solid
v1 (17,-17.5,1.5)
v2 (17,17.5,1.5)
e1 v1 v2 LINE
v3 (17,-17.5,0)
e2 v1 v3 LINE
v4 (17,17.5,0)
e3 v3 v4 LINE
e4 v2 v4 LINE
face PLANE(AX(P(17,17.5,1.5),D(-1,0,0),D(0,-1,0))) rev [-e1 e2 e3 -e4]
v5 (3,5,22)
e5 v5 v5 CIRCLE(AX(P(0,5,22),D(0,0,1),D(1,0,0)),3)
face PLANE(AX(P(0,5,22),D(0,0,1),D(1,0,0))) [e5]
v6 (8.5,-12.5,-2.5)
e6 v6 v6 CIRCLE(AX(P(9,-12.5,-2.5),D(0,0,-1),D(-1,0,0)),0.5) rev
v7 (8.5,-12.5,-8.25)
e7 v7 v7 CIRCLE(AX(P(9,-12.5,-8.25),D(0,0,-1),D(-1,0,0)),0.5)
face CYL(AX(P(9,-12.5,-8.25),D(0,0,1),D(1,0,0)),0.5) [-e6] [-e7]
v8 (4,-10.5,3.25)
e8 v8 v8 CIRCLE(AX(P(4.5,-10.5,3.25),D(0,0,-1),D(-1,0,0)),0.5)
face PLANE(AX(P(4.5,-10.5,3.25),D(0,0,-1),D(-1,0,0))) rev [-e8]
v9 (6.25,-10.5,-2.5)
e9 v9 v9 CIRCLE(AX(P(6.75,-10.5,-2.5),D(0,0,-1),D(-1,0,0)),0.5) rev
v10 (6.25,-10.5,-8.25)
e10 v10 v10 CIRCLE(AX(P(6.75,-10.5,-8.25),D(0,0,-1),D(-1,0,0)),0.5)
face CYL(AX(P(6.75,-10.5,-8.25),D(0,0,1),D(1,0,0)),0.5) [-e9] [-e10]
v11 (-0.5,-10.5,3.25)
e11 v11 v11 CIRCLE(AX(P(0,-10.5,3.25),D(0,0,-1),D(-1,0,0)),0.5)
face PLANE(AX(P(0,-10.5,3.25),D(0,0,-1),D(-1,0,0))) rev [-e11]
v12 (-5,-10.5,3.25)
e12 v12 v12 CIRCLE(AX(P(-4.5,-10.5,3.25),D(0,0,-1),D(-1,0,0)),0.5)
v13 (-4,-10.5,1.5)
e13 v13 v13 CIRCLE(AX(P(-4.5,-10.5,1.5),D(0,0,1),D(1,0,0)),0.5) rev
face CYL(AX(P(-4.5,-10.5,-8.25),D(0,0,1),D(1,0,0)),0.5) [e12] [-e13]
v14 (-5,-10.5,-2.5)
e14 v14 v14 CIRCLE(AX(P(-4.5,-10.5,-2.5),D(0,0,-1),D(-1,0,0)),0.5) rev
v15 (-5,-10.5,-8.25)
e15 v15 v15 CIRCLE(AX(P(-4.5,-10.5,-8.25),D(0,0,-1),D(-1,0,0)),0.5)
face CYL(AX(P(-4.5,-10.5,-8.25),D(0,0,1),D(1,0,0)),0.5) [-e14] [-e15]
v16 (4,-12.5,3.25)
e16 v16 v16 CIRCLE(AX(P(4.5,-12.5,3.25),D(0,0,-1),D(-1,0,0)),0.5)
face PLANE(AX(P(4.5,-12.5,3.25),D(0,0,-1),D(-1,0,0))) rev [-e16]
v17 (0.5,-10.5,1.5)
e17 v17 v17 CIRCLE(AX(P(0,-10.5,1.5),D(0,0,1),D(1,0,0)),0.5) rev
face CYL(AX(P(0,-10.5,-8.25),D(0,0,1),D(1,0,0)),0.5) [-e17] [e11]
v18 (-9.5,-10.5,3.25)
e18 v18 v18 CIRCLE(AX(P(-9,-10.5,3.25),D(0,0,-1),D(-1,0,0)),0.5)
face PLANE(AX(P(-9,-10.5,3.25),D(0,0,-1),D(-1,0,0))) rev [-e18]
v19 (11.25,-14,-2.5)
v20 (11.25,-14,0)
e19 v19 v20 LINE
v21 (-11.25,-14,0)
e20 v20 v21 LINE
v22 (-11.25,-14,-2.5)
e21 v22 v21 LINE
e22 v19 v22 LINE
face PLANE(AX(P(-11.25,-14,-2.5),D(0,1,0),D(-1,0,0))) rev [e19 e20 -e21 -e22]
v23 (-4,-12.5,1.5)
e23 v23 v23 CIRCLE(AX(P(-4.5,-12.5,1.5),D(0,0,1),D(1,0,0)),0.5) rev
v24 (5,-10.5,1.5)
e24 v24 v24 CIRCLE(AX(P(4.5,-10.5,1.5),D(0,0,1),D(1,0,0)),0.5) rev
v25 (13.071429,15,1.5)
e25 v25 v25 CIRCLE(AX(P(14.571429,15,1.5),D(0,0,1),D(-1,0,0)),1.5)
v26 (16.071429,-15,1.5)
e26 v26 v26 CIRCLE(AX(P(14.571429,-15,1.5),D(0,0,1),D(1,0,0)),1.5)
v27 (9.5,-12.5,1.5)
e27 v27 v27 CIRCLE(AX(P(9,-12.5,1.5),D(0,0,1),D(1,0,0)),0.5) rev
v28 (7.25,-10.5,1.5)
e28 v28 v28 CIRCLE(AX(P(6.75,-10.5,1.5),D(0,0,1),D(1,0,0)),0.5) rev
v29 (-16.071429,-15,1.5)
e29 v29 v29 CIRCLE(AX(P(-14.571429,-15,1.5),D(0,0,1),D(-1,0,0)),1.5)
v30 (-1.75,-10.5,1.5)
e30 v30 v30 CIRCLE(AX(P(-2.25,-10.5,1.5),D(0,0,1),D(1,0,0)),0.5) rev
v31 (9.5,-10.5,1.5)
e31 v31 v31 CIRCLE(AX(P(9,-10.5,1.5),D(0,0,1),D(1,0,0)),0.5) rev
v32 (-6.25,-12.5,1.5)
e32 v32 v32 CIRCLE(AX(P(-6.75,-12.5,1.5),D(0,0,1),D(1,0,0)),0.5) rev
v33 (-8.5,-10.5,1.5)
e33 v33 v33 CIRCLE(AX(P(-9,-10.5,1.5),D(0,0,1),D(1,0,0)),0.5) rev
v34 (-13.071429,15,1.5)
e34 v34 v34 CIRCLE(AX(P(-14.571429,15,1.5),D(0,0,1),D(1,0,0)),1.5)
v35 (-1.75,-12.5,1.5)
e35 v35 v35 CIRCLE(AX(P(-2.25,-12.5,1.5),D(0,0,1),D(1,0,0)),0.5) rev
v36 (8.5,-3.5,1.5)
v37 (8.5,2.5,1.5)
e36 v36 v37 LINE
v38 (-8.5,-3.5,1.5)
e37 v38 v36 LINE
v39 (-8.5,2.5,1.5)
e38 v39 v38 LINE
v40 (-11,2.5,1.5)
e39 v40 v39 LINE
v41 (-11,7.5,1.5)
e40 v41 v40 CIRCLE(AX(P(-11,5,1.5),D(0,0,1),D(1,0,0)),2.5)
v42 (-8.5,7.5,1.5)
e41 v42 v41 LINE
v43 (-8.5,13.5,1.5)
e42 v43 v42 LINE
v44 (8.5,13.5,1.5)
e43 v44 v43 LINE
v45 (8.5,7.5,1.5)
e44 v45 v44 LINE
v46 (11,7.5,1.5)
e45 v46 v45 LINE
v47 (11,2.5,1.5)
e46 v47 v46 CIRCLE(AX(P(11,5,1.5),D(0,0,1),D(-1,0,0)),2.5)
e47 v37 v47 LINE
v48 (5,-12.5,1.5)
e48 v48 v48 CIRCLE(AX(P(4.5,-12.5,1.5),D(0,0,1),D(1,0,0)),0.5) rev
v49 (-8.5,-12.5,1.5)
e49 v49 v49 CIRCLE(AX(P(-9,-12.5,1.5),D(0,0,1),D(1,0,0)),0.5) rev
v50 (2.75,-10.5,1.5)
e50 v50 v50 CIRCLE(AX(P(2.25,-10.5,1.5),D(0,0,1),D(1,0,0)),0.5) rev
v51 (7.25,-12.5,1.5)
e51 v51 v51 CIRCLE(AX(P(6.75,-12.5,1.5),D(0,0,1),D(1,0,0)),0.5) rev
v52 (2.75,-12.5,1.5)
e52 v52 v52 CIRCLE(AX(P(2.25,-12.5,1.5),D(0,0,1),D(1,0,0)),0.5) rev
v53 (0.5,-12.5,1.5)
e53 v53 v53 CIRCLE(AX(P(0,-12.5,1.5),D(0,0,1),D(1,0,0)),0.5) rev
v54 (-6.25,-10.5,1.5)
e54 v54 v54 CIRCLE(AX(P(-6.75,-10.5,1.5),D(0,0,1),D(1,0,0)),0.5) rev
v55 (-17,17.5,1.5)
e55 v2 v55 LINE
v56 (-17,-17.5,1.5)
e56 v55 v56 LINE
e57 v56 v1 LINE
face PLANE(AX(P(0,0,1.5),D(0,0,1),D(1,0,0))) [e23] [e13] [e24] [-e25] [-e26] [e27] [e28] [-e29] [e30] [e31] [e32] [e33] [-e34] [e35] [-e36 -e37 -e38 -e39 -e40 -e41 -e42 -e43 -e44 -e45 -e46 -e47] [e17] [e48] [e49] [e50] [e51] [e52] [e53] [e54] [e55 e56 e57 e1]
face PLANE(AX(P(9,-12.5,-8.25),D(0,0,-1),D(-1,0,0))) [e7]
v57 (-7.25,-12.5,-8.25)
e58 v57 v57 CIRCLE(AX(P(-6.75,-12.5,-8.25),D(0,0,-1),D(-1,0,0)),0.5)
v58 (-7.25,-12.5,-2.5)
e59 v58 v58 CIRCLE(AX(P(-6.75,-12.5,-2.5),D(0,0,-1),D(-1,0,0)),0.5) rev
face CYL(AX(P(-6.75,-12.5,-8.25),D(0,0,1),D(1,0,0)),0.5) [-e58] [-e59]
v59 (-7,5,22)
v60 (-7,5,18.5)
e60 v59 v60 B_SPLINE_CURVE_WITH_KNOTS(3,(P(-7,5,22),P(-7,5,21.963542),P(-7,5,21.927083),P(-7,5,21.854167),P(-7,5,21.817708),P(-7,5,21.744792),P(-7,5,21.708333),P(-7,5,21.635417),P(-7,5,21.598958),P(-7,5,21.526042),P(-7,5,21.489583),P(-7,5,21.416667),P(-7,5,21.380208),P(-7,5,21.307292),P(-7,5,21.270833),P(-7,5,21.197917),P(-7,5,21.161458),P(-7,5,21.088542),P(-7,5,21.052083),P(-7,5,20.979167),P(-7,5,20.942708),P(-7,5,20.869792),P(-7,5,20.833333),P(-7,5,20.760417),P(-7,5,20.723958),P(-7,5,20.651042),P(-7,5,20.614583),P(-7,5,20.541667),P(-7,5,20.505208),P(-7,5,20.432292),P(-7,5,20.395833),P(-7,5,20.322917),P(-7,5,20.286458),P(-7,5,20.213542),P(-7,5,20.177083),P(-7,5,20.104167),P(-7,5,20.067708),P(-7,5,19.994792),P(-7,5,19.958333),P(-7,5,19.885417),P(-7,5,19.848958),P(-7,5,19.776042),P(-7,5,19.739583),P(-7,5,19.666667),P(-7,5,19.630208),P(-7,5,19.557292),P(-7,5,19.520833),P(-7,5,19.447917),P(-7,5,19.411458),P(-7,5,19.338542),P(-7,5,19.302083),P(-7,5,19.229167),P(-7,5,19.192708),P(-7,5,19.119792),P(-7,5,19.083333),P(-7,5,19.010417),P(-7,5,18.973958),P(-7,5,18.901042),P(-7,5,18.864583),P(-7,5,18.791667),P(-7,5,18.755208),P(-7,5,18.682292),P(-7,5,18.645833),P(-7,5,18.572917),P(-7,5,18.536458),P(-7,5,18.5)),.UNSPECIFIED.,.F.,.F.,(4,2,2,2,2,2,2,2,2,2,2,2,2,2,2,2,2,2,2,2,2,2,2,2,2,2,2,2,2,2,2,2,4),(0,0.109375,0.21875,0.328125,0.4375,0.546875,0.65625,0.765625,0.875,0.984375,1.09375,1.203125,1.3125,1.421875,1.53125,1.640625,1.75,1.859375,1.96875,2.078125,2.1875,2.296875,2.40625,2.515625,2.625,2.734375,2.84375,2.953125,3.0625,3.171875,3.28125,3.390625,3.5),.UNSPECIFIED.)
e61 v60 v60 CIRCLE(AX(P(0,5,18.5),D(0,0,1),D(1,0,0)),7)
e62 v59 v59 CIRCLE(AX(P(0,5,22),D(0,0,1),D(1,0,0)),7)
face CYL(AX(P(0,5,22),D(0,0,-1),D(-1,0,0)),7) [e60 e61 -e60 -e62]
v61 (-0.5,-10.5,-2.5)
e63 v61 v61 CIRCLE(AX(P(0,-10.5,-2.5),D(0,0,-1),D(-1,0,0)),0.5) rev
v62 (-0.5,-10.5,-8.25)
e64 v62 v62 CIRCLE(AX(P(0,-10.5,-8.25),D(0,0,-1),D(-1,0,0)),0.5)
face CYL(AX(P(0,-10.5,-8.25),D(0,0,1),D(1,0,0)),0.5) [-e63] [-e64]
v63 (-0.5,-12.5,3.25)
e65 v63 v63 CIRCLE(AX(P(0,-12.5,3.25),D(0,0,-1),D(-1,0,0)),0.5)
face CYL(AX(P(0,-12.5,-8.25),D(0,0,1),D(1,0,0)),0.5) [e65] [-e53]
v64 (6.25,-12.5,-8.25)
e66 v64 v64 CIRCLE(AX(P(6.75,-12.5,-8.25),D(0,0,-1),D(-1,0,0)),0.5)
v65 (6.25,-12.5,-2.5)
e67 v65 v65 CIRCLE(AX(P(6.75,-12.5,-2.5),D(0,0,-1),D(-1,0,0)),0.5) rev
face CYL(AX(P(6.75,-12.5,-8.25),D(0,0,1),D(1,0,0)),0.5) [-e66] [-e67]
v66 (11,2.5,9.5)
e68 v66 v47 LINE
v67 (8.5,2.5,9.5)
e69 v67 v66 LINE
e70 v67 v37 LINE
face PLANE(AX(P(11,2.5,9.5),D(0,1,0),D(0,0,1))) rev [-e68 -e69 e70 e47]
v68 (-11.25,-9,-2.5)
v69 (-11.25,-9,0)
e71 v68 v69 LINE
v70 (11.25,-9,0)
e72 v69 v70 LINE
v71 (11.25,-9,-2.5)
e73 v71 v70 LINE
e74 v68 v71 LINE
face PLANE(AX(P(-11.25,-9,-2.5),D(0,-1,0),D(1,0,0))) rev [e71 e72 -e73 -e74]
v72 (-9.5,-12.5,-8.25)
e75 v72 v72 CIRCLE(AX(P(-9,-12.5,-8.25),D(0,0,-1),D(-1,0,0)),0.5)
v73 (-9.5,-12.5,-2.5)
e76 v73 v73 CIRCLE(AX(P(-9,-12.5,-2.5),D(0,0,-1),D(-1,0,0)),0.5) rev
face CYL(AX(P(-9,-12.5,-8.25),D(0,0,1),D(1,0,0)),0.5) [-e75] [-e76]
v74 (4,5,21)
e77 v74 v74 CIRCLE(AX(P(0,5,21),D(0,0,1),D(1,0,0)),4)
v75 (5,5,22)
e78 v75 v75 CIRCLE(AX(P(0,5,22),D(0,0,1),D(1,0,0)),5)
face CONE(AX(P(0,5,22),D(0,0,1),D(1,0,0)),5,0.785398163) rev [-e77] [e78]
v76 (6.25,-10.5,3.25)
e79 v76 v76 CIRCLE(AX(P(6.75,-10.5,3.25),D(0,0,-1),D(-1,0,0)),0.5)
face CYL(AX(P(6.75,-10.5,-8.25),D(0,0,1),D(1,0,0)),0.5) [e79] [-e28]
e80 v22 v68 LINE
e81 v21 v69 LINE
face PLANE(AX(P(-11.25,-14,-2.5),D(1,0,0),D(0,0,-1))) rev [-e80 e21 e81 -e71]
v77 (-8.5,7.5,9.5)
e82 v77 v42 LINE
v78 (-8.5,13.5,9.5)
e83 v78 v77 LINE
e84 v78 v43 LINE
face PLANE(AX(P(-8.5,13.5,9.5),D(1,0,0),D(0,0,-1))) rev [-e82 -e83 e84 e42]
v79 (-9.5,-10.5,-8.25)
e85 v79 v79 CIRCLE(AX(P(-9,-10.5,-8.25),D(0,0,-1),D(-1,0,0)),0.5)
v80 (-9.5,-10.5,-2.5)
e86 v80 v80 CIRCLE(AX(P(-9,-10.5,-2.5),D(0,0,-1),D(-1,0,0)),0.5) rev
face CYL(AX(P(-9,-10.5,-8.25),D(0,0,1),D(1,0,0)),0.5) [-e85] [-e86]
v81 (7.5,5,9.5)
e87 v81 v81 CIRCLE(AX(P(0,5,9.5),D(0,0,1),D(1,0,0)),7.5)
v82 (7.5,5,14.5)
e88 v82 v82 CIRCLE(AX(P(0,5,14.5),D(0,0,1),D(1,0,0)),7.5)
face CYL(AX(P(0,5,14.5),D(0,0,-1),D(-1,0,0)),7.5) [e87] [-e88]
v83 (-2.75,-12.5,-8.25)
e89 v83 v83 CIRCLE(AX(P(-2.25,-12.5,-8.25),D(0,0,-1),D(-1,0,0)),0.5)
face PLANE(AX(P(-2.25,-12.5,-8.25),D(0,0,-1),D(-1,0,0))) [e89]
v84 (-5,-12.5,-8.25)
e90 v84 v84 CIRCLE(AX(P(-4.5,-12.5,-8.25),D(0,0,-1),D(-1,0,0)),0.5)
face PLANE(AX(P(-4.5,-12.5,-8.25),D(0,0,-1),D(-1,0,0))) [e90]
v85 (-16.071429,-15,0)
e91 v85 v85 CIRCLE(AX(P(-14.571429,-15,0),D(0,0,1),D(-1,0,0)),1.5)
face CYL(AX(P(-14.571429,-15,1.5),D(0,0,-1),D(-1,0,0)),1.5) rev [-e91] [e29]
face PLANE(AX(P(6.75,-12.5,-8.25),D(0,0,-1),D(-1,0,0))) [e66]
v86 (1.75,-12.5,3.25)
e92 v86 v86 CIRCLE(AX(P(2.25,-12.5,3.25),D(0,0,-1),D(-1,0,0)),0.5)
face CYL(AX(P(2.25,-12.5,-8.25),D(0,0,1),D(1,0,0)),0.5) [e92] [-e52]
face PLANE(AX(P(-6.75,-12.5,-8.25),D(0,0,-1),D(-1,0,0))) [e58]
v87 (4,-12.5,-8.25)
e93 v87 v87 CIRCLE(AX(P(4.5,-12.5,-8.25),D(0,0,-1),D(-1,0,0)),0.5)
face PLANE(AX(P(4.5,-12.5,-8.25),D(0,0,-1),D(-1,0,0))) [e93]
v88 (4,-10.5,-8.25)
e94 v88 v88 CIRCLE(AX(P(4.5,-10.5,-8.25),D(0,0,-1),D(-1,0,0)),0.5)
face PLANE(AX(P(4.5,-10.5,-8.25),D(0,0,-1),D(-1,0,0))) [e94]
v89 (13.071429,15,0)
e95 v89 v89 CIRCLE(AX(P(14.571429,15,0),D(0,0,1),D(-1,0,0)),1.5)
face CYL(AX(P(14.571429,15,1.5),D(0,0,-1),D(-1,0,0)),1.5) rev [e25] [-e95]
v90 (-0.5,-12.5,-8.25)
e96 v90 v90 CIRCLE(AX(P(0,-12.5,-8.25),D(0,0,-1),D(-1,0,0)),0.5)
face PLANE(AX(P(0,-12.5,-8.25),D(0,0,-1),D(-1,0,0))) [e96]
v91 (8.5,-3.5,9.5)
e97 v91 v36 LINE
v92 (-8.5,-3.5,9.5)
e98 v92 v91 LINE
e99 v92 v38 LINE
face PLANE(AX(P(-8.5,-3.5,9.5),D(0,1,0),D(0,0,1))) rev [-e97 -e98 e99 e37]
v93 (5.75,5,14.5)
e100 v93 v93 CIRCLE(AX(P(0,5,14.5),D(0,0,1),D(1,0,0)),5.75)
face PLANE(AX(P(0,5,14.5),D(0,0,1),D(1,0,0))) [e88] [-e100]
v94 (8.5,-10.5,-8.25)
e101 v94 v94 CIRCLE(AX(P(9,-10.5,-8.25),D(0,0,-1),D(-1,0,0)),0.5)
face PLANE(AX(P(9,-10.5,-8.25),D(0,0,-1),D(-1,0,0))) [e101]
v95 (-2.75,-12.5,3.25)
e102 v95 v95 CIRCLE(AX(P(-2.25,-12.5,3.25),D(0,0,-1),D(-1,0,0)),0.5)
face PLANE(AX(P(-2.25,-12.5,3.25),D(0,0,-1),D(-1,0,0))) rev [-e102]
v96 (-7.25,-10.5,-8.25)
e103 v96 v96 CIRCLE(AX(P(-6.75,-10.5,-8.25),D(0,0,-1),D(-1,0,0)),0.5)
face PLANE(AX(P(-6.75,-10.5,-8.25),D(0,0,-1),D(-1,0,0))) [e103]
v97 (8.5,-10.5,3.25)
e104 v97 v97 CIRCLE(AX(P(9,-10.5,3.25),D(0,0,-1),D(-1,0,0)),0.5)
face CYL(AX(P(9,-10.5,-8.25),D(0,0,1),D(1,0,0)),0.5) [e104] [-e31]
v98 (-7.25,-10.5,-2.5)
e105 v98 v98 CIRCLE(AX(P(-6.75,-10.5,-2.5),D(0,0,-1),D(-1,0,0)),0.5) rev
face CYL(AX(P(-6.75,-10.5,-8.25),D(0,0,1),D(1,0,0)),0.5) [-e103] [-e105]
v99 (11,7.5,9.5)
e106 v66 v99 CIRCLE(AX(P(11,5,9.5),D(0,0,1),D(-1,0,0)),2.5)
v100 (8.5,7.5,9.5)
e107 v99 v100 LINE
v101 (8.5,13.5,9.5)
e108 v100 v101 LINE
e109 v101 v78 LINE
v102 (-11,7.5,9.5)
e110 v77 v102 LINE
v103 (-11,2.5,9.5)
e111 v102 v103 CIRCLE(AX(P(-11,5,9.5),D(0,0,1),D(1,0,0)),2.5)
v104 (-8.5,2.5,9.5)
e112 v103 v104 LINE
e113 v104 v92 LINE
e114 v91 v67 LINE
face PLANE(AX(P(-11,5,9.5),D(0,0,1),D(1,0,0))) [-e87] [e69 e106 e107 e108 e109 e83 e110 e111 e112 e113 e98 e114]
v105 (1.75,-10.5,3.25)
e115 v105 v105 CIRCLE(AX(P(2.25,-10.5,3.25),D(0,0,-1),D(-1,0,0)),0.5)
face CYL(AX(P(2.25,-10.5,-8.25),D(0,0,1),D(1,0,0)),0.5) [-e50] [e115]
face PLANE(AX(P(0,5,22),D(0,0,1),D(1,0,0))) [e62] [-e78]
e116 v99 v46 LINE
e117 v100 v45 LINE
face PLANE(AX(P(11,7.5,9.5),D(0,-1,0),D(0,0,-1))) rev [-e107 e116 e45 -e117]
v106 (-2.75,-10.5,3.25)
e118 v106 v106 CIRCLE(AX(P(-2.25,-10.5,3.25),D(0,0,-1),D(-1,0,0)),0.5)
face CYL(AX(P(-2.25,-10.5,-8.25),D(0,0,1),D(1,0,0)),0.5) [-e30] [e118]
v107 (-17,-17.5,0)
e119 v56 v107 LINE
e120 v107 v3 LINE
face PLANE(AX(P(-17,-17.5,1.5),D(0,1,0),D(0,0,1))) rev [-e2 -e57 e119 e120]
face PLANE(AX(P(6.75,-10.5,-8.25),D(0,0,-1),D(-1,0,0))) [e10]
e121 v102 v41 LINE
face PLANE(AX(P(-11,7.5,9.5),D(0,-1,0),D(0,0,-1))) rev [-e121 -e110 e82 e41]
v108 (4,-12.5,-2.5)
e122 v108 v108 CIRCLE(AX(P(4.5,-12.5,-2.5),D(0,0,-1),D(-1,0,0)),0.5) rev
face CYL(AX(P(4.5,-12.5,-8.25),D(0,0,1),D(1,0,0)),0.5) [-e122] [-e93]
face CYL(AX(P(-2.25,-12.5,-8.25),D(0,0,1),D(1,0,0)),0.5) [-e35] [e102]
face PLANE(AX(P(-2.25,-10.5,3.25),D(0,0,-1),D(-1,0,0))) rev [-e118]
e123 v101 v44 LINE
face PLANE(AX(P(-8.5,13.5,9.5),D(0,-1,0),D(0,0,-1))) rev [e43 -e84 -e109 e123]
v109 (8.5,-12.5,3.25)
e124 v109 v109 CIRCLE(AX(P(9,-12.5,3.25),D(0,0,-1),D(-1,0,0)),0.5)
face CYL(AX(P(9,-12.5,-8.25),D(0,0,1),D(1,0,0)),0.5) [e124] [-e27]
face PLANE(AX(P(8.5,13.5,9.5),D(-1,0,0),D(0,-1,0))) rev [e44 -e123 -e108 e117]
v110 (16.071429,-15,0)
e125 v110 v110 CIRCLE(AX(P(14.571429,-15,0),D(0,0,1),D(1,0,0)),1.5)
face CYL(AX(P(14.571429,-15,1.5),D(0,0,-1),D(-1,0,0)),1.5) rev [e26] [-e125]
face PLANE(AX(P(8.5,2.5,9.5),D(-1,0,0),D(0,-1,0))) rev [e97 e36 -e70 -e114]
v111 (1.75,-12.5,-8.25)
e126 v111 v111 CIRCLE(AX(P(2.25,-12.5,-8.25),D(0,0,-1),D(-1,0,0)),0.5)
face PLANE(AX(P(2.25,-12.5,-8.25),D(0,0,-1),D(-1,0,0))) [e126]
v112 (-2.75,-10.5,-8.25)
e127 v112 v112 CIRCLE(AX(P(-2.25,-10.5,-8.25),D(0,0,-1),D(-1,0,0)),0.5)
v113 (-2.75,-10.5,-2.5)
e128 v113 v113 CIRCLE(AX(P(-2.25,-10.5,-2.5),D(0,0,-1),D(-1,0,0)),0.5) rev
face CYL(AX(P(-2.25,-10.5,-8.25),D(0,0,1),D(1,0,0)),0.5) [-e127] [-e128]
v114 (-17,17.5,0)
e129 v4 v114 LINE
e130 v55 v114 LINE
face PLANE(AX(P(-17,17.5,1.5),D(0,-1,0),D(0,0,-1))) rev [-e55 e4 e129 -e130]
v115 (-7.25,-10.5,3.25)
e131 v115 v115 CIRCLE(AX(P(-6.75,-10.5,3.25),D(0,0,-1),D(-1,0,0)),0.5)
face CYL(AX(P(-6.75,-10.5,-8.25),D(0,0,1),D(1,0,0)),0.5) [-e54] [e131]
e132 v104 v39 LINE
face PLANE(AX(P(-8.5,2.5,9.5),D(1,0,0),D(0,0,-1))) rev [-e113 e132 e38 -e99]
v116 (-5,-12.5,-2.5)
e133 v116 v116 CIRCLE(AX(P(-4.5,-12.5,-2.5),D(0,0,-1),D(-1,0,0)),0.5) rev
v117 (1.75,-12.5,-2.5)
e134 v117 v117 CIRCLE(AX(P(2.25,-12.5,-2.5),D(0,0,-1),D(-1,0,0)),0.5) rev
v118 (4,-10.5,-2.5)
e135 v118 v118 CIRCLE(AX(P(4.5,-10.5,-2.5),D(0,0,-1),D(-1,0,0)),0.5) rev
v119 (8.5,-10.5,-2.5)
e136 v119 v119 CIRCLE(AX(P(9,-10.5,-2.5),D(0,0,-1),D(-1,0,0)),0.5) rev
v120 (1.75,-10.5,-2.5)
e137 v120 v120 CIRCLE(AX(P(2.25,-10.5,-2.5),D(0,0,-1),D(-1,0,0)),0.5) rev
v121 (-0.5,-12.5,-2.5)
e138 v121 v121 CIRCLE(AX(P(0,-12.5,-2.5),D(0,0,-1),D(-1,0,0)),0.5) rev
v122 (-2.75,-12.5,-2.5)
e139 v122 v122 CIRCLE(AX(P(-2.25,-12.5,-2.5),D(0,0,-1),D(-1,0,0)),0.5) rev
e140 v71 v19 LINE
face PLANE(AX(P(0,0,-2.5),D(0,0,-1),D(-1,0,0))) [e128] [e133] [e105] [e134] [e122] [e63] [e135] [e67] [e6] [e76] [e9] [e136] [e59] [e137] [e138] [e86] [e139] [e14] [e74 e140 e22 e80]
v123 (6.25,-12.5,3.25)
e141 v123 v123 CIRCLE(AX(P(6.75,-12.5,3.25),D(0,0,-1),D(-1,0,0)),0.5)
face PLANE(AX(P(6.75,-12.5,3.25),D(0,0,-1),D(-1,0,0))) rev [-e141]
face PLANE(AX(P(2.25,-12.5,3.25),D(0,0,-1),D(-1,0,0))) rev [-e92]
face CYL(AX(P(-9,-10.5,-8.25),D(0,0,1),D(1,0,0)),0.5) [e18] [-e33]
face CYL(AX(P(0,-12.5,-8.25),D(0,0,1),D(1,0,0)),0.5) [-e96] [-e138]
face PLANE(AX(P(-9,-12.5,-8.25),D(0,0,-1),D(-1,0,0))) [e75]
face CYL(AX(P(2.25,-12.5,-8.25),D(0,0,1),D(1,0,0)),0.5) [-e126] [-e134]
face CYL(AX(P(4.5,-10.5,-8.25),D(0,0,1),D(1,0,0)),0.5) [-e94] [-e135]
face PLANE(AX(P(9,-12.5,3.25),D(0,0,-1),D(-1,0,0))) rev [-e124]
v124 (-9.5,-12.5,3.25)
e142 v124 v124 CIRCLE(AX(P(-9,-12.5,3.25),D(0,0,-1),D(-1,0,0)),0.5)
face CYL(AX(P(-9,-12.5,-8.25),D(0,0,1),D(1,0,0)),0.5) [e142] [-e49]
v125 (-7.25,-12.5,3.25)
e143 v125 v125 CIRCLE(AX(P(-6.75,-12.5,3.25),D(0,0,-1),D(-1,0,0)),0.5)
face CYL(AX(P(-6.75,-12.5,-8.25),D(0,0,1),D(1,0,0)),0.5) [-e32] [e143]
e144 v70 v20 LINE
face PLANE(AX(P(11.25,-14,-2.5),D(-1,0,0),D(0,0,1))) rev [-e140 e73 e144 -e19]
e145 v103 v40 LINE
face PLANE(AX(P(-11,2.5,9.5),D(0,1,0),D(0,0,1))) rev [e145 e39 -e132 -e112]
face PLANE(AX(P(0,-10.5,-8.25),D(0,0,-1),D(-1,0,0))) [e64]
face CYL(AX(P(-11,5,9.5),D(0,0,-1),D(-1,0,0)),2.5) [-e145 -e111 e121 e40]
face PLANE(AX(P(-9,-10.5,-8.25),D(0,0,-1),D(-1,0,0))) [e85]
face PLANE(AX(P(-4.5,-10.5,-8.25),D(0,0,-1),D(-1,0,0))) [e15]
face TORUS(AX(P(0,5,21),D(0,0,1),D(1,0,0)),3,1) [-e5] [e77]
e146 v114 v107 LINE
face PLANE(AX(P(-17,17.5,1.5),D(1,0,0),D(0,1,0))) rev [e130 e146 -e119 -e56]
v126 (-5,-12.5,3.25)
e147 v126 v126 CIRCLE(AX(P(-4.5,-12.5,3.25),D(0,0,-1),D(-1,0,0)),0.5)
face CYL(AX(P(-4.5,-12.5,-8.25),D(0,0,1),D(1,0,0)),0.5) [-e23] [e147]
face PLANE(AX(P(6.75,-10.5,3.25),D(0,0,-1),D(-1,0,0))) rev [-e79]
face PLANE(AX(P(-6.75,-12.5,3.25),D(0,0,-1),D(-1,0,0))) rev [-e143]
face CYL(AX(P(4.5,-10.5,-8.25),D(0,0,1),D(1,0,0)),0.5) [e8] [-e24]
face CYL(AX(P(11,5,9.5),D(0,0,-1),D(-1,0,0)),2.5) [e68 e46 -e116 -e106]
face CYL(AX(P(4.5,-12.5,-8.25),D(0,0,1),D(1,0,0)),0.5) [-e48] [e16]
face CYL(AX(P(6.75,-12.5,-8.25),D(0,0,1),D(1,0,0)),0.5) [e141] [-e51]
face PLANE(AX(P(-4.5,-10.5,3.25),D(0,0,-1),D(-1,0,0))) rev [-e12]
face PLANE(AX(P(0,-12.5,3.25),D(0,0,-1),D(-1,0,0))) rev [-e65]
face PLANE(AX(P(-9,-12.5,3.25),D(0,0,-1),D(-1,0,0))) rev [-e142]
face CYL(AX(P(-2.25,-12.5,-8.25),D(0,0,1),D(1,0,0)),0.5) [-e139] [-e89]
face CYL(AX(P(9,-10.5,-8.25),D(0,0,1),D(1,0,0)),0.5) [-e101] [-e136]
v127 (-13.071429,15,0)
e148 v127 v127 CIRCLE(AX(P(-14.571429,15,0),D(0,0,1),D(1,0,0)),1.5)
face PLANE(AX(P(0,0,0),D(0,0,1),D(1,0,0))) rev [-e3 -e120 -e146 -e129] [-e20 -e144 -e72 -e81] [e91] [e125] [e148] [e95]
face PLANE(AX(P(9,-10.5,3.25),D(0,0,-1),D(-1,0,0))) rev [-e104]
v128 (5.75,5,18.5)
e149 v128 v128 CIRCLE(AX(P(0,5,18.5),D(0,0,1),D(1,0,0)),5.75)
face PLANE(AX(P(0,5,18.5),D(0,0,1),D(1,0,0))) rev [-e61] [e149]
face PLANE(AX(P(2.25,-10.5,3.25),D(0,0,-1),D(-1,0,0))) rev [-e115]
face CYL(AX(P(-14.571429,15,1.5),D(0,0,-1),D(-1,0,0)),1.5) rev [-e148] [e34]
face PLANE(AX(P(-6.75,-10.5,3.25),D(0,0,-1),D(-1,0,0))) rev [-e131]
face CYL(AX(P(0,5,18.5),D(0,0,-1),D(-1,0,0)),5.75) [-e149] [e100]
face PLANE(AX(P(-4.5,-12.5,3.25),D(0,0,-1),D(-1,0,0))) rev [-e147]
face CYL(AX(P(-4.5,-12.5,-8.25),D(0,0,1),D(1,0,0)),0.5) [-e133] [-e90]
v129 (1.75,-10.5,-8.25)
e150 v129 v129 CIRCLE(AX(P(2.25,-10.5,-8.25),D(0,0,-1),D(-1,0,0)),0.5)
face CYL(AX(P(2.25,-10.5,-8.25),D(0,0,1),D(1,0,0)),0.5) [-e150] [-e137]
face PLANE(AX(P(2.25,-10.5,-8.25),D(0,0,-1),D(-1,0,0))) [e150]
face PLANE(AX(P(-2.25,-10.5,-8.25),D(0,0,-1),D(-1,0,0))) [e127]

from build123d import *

# Parameters (mm, degrees)
CROQUIS1_W              = 34
CROQUIS1_H              = 35
CROQUIS1_R              = 1.5
SALIENTE_EXTRUIR1_DEPTH = 1.5
CROQUIS2_W              = 22.5
CROQUIS2_H              = 5
SALIENTE_EXTRUIR2_DEPTH = 2.5
SALIENTE_EXTRUIR3_DEPTH = 8
CROQUIS4_R              = 7.5
SALIENTE_EXTRUIR4_DEPTH = 5
CROQUIS5_R              = 5.75
SALIENTE_EXTRUIR5_DEPTH = 4
CROQUIS6_R              = 7
SALIENTE_EXTRUIR6_DEPTH = 3.5
CROQUIS7_R              = 5
CORTAR_EXTRUIR1_DEPTH   = 1
CORTAR_EXTRUIR1_DRAFT   = -45
CROQUIS8_R              = 4
SALIENTE_EXTRUIR7_DEPTH = 1
REDONDEO1_R             = 1
CROQUIS10_R             = 0.5
SALIENTE_EXTRUIR8_DEPTH = 5.75


with BuildPart() as part:
    # Croquis1 → Saliente-Extruir1 (new body)
    with BuildSketch(Plane.XY):
        Rectangle(CROQUIS1_W, CROQUIS1_H)
        with Locations((-14.571428571, 15)):
            Circle(CROQUIS1_R, mode=Mode.SUBTRACT)
        with Locations(Location((14.571428571, 15, 0), (0, 0, 180))):
            Circle(CROQUIS1_R, mode=Mode.SUBTRACT)
        with Locations((14.571428571, -15)):
            Circle(CROQUIS1_R, mode=Mode.SUBTRACT)
        with Locations(Location((-14.571428571, -15, 0), (0, 0, 180))):
            Circle(CROQUIS1_R, mode=Mode.SUBTRACT)
    extrude(amount=SALIENTE_EXTRUIR1_DEPTH)

    # Croquis2 → Saliente-Extruir2 (add)
    with BuildSketch(Plane(origin=(0, 0, 0), x_dir=(-1, 0, 0), z_dir=(0, 0, -1))):
        with Locations((0, -11.5)):
            Rectangle(CROQUIS2_W, CROQUIS2_H)
    extrude(amount=SALIENTE_EXTRUIR2_DEPTH)

    # Croquis3 → Saliente-Extruir3 (add)
    with BuildSketch(Plane.XY.offset(1.5)):
        with BuildLine():
            Line((-8.5, 13.5), (8.5, 13.5))
            Line((8.5, 13.5), (8.5, 7.5))
            Line((8.5, 7.5), (11, 7.5))
            ThreePointArc((11, 7.5), (13.5, 5), (11, 2.5))
            Line((11, 2.5), (8.5, 2.5))
            Line((8.5, 2.5), (8.5, -3.5))
            Line((8.5, -3.5), (-8.5, -3.5))
            Line((-8.5, -3.5), (-8.5, 2.5))
            Line((-8.5, 2.5), (-11, 2.5))
            ThreePointArc((-11, 2.5), (-13.5, 5), (-11, 7.5))
            Line((-11, 7.5), (-8.5, 7.5))
            Line((-8.5, 7.5), (-8.5, 13.5))
        make_face()
    extrude(amount=SALIENTE_EXTRUIR3_DEPTH)

    # Croquis4 → Saliente-Extruir4 (add)
    with BuildSketch(Plane.XY.offset(9.5)):
        with Locations((0, 5)):
            Circle(CROQUIS4_R)
    extrude(amount=SALIENTE_EXTRUIR4_DEPTH)

    # Croquis5 → Saliente-Extruir5 (add)
    with BuildSketch(Plane.XY.offset(14.5)):
        with Locations((0, 5)):
            Circle(CROQUIS5_R)
    extrude(amount=SALIENTE_EXTRUIR5_DEPTH)

    # Croquis6 → Saliente-Extruir6 (add)
    with BuildSketch(Plane.XY.offset(18.5)):
        with Locations(Location((0, 5, 0), (0, 0, 180))):
            Circle(CROQUIS6_R)
    extrude(amount=SALIENTE_EXTRUIR6_DEPTH)


with BuildPart() as cortar_extruir1_tool:
    # Croquis7 → Cortar-Extruir1 (with draft: the straight prism first)
    with BuildSketch(Plane.XY.offset(22)):
        with Locations((0, 5)):
            Circle(CROQUIS7_R)
    extrude(amount=-CORTAR_EXTRUIR1_DEPTH)
    # Cortar-Extruir1: the draft: its side faces are tilted about the plane it starts from
    cortar_extruir1_sides = [cortar_extruir1_tool.faces().sort_by_distance(p)[0] for p in [
        (-5, 5, 21.5),
    ]]
    draft(cortar_extruir1_sides, Plane.XY.offset(22), CORTAR_EXTRUIR1_DRAFT)


with BuildPart() as part_1:
    add(part.part)

    # Cortar-Extruir1: cut by cortar_extruir1_tool
    add(cortar_extruir1_tool.part, mode=Mode.SUBTRACT)

    # Croquis8 → Saliente-Extruir7 (add)
    with BuildSketch(Plane.XY.offset(21)):
        with Locations((0, 5)):
            Circle(CROQUIS8_R)
    extrude(amount=SALIENTE_EXTRUIR7_DEPTH)

    # Redondeo1
    redondeo1_edges = [part_1.edges().sort_by_distance(p)[0] for p in [
        (-4, 5, 22),
    ]]
    fillet(redondeo1_edges, radius=REDONDEO1_R - 0.0001)  # a hair under: the kernel refuses the full size

    # Croquis10 → Saliente-Extruir8 (add, symmetric)
    with BuildSketch(Plane(origin=(0, 0, -2.5), x_dir=(-1, 0, 0), z_dir=(0, 0, -1))):
        with Locations((-9, -12.5)):
            Circle(CROQUIS10_R)
        with Locations((-9, -10.5)):
            Circle(CROQUIS10_R)
        with Locations((-6.75, -10.5)):
            Circle(CROQUIS10_R)
        with Locations((-4.5, -10.5)):
            Circle(CROQUIS10_R)
        with Locations((-2.25, -10.5)):
            Circle(CROQUIS10_R)
        with Locations((0, -10.5)):
            Circle(CROQUIS10_R)
        with Locations((2.25, -10.5)):
            Circle(CROQUIS10_R)
        with Locations((4.5, -10.5)):
            Circle(CROQUIS10_R)
        with Locations((6.75, -10.5)):
            Circle(CROQUIS10_R)
        with Locations((9, -10.5)):
            Circle(CROQUIS10_R)
        with Locations((-6.75, -12.5)):
            Circle(CROQUIS10_R)
        with Locations((-4.5, -12.5)):
            Circle(CROQUIS10_R)
        with Locations((-2.25, -12.5)):
            Circle(CROQUIS10_R)
        with Locations((0, -12.5)):
            Circle(CROQUIS10_R)
        with Locations((2.25, -12.5)):
            Circle(CROQUIS10_R)
        with Locations((4.5, -12.5)):
            Circle(CROQUIS10_R)
        with Locations((6.75, -12.5)):
            Circle(CROQUIS10_R)
        with Locations((9, -12.5)):
            Circle(CROQUIS10_R)
    extrude(amount=SALIENTE_EXTRUIR8_DEPTH, both=True)


solid = part_1.part
